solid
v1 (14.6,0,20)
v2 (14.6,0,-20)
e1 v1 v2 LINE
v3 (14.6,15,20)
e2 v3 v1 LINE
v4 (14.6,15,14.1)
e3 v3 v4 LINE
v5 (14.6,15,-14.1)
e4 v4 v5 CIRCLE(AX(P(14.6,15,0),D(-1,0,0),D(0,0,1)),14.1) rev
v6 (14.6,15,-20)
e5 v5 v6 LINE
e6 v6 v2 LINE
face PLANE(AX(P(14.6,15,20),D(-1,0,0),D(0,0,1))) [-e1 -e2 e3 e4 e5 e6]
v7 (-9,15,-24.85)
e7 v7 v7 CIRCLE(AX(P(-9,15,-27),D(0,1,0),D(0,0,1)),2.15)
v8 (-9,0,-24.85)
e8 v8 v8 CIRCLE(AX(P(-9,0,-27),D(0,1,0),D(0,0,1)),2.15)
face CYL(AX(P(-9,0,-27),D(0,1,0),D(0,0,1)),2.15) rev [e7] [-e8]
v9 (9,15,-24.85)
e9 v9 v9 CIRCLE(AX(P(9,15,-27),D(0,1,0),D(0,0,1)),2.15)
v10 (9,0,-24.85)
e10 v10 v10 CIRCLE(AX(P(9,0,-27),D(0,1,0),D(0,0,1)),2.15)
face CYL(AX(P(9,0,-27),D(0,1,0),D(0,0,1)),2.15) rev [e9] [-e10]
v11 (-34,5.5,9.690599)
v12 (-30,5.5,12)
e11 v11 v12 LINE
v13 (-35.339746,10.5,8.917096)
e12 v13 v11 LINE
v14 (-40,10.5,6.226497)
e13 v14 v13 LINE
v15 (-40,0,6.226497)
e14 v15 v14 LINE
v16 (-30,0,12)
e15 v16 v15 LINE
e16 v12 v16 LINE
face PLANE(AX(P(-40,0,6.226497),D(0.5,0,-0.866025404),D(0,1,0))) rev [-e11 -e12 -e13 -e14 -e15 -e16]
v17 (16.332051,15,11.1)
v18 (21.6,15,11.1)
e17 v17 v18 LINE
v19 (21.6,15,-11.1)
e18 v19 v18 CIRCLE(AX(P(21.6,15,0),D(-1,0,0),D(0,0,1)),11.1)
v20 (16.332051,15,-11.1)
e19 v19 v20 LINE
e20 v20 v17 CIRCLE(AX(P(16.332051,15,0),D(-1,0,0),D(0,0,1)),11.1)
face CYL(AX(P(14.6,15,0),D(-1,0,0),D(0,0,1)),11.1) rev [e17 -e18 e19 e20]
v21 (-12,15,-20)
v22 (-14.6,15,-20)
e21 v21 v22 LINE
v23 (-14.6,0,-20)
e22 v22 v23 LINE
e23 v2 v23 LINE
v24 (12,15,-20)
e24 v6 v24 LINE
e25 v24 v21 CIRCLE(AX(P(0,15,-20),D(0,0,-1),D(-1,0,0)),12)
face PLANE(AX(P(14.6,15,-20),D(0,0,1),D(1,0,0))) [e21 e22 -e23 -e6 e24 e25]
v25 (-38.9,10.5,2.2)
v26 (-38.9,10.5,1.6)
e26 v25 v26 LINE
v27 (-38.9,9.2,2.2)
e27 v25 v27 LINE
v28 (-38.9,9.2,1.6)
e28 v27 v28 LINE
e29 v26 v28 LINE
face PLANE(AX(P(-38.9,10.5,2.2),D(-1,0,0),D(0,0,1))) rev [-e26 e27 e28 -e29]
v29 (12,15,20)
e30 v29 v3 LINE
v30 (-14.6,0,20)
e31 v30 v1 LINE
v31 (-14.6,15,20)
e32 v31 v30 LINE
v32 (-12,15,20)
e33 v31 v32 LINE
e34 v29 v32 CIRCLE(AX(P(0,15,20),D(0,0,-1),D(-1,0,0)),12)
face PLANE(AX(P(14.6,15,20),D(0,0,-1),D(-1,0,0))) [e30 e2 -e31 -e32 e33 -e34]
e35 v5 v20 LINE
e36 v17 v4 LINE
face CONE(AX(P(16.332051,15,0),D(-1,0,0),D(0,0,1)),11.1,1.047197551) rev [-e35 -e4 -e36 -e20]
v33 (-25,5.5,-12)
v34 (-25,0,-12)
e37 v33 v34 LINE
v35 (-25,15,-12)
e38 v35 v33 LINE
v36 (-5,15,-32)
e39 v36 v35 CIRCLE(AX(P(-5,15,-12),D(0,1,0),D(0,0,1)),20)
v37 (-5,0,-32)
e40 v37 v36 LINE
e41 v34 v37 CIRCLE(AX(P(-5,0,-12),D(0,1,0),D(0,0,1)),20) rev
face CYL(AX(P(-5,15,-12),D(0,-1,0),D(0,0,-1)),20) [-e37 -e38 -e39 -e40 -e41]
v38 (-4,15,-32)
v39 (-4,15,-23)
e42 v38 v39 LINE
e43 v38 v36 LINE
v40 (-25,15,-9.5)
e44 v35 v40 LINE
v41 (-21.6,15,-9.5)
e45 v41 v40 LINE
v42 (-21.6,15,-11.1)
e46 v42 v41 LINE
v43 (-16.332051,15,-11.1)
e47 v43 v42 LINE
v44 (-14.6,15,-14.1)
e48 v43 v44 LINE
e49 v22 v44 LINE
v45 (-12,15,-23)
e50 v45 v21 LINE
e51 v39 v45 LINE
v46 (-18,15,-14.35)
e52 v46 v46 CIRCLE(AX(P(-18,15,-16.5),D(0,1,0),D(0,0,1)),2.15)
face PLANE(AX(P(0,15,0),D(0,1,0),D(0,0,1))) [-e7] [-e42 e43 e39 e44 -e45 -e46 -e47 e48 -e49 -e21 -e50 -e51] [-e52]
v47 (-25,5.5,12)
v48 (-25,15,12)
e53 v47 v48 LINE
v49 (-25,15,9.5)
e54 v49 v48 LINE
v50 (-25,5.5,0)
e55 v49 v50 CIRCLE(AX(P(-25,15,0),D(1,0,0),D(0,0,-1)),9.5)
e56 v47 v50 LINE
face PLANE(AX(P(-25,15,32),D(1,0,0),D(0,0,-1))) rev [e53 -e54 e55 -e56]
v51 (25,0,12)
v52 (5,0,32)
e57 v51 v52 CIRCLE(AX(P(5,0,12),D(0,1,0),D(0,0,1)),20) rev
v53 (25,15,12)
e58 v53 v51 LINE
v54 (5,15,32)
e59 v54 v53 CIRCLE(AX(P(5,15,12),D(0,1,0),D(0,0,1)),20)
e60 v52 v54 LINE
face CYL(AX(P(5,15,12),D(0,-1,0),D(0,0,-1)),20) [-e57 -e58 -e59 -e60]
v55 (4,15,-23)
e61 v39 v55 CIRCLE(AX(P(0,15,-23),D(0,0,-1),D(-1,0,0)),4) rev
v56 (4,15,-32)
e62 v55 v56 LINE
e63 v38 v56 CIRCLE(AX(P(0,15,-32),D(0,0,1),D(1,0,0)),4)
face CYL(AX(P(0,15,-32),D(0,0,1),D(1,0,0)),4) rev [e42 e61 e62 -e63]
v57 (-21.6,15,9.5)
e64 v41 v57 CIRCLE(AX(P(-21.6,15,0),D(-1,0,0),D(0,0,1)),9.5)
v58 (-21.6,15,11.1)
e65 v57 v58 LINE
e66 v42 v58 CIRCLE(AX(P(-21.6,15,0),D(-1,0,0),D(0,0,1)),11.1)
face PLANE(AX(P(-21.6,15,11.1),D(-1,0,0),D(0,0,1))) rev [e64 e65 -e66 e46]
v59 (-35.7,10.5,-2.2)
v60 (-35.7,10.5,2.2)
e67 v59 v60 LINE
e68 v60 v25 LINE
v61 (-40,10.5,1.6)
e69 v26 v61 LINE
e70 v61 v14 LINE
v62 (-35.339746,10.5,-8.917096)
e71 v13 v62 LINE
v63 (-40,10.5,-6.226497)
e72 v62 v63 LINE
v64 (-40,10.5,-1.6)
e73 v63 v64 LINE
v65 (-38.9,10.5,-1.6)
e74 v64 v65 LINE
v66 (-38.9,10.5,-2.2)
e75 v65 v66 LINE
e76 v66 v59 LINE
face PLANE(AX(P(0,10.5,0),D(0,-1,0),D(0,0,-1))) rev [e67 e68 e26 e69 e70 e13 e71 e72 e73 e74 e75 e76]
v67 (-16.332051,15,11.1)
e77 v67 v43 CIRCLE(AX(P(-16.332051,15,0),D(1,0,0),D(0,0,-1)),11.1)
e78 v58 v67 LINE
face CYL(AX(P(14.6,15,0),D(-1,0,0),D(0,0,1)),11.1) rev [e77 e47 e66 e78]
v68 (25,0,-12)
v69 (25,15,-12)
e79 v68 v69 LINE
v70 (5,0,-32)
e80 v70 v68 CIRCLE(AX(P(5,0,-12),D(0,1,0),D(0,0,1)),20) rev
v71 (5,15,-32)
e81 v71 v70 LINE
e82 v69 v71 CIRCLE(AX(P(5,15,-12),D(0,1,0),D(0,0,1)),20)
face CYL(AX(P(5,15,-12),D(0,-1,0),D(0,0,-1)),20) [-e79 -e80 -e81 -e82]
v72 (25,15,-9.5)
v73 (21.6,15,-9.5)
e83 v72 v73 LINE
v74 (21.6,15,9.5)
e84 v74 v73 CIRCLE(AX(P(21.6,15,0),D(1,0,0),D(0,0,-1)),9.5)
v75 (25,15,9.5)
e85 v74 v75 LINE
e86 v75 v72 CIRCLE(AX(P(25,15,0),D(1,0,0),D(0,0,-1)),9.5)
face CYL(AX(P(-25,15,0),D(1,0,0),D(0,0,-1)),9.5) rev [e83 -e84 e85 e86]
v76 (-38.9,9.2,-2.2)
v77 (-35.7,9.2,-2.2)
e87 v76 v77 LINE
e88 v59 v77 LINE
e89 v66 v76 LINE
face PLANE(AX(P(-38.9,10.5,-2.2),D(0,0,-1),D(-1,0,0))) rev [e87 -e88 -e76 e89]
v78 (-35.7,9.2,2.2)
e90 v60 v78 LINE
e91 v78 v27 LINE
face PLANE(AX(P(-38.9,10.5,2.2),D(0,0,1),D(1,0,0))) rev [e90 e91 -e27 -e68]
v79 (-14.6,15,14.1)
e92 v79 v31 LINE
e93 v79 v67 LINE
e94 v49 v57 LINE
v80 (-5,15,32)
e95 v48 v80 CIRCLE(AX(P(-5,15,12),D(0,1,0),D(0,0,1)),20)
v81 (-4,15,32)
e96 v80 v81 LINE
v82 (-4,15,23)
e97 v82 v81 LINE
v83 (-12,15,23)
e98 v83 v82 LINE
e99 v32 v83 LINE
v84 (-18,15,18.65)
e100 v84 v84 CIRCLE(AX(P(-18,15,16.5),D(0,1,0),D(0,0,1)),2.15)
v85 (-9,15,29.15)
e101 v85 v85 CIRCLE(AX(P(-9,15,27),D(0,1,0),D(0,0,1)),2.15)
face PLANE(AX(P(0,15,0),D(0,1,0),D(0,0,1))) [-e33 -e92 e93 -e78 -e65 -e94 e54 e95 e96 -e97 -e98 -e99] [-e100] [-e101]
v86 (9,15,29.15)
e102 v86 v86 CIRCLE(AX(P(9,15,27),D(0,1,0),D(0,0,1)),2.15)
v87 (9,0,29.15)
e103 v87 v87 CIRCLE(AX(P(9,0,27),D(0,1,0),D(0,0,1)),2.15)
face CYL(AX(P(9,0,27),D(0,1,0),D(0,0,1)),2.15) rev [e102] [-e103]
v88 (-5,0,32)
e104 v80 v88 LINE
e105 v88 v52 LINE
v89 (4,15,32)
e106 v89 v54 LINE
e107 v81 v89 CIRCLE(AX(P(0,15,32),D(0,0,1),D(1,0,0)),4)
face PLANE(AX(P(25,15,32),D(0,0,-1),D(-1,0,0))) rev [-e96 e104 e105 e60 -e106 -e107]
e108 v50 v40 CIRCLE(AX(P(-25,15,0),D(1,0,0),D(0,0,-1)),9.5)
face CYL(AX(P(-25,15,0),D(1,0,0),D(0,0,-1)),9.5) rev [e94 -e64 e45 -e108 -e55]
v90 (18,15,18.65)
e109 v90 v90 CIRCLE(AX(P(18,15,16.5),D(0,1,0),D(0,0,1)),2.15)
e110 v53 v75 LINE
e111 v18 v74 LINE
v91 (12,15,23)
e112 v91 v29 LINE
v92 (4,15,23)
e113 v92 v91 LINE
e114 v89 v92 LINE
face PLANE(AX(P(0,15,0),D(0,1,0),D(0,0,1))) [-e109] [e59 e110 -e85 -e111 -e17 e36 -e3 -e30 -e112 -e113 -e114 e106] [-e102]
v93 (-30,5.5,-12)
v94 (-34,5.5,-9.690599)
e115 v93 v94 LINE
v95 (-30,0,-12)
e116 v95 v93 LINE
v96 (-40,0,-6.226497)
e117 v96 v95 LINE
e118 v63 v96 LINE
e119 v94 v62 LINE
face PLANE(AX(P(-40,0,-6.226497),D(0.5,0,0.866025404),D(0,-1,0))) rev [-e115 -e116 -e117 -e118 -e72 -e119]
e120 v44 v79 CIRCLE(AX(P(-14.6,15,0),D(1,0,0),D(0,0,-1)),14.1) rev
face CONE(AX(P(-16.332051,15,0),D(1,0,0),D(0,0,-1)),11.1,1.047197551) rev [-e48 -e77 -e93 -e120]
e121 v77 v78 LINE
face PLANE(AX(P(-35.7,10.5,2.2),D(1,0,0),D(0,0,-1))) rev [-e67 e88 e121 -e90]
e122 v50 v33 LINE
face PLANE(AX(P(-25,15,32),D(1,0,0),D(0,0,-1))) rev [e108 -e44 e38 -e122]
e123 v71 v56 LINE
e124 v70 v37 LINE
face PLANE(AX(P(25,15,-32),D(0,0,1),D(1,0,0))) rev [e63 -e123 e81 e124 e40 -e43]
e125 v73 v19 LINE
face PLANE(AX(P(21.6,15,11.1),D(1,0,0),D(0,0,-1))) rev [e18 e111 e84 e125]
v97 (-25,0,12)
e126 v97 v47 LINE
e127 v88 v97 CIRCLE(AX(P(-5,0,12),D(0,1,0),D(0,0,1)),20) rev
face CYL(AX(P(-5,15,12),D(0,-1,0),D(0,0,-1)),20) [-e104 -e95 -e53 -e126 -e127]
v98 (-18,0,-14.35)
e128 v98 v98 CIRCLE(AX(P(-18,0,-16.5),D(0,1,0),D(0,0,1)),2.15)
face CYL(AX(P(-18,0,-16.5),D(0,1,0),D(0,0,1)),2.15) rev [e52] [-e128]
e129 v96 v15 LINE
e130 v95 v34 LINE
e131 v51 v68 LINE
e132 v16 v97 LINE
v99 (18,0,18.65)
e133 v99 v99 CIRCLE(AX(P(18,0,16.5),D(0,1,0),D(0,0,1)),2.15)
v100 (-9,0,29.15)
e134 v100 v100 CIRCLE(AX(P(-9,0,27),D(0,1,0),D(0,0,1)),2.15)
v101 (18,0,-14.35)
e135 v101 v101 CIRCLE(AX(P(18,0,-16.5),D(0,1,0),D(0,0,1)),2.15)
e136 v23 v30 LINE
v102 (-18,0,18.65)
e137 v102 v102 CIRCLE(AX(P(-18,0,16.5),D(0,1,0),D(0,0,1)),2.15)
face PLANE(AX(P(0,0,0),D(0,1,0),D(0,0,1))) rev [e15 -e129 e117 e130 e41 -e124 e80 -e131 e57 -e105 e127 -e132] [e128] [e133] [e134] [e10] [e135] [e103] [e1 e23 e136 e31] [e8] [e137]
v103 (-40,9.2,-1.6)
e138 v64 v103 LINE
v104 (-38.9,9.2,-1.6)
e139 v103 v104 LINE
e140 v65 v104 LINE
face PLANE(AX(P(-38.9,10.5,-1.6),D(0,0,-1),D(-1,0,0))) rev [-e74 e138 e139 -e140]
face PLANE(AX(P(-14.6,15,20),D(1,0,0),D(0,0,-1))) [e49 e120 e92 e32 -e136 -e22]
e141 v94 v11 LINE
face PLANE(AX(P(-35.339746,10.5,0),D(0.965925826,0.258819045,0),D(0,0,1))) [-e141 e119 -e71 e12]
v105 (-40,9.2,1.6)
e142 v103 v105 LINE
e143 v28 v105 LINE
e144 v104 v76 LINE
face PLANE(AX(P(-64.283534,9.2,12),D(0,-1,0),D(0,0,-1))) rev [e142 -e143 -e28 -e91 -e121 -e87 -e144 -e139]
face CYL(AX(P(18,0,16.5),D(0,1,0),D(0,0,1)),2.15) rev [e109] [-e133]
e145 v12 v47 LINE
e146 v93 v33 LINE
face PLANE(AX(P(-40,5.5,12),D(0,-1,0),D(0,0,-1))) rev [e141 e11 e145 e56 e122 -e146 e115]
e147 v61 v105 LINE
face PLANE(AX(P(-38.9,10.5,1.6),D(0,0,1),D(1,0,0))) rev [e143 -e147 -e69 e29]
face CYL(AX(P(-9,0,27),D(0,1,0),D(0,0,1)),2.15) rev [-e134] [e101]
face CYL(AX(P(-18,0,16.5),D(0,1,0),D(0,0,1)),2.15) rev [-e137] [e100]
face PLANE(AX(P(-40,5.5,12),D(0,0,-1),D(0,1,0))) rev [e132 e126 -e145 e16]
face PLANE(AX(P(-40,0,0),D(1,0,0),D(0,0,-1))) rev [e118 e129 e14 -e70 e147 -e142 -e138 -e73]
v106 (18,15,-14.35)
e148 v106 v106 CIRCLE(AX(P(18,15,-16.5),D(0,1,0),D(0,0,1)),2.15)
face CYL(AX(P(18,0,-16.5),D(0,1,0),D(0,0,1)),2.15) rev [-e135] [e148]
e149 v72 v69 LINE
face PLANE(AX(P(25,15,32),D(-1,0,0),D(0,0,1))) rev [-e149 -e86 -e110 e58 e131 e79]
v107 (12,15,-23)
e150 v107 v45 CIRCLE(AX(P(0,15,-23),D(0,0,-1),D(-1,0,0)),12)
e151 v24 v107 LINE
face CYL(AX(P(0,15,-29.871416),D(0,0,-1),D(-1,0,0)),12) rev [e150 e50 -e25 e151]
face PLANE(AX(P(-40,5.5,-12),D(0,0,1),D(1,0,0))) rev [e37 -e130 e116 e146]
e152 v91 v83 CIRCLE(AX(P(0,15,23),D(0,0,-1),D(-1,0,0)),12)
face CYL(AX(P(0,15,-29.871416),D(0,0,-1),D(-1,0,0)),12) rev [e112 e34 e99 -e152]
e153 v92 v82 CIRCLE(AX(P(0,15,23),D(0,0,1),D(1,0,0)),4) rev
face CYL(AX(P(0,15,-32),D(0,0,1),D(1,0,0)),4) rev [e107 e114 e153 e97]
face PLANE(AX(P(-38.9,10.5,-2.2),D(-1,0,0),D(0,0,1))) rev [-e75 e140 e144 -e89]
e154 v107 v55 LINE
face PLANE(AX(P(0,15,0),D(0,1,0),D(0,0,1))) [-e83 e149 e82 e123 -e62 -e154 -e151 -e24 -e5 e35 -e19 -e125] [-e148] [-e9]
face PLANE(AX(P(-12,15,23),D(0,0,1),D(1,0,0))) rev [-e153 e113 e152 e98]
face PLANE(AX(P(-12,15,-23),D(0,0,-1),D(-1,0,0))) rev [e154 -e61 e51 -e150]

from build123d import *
from OCP.BRepFilletAPI import BRepFilletAPI_MakeChamfer

# Parameters (mm, degrees)
SKETCH1_W           = 50
SKETCH1_H           = 64
SKETCH1_W_2         = 29.2
SKETCH1_H_2         = 40
BOSS_EXTRUDE1_DEPTH = 15
SKETCH3_W           = 7
SKETCH3_H           = 11.1
SKETCH4_R           = 9.5
CUT_EXTRUDE2_DEPTH  = 62.229078059
SKETCH5_R           = 4
CUT_EXTRUDE3_DEPTH  = 71.32780389
SKETCH8_R           = 2.15
CUT_EXTRUDE6_DEPTH  = 44.289721644
FILLET1_R           = 20
CHAMFER1_SIZE       = 3
CHAMFER1_SIZE2      = 1.732050808
SKETCH9_W           = 12
SKETCH9_H           = 3
SKETCH10_W          = 24
SKETCH10_H          = 5.5
BOSS_EXTRUDE2_DEPTH = 15
BOSS_EXTRUDE3_START = 9
SKETCH12_W          = 24
SKETCH12_H          = 3.7
BOSS_EXTRUDE3_DEPTH = 6
BOSS_EXTRUDE4_DEPTH = 1.3
CHAMFER2_SIZE2      = 1.339745962
CHAMFER2_SIZE       = 5
CHAMFER3_SIZE       = 10
CHAMFER3_SIZE2      = 5.773502692


with BuildPart() as part:
    # Sketch1 → Boss-Extrude1 (new body)
    with BuildSketch(Plane(origin=(0, 0, 0), x_dir=(1, 0, 0), z_dir=(0, 1, 0))):
        Rectangle(SKETCH1_W, SKETCH1_H)
        Rectangle(SKETCH1_W_2, SKETCH1_H_2, mode=Mode.SUBTRACT)
    extrude(amount=BOSS_EXTRUDE1_DEPTH)

    # Sketch3 → Cut-Revolve1 (revolve, cut)
    with BuildSketch(Plane(origin=(0, 15, 0), x_dir=(1, 0, 0), z_dir=(0, 1, 0))):
        with Locations((18.1, -5.55)):
            Rectangle(SKETCH3_W, SKETCH3_H)
        with Locations((-18.1, -5.55)):
            Rectangle(SKETCH3_W, SKETCH3_H)
    revolve(axis=Axis((14.6, 15, 0), (1, 0, 0)), mode=Mode.SUBTRACT)

    # Sketch4 → Cut-Extrude2 (cut, through all)
    with BuildSketch(Plane(origin=(25, 0, 0), x_dir=(0, 0, -1), z_dir=(1, 0, 0))):
        with Locations((0, 15)):
            Circle(SKETCH4_R)
    extrude(amount=-CUT_EXTRUDE2_DEPTH, mode=Mode.SUBTRACT)

    # Sketch5 → Cut-Extrude3 (cut, through all)
    with BuildSketch(Plane.XY.offset(32)):
        with Locations((0, 15)):
            Circle(SKETCH5_R)
    extrude(amount=-CUT_EXTRUDE3_DEPTH, mode=Mode.SUBTRACT)

    # Sketch8 → Cut-Extrude6 (cut, through all)
    with BuildSketch(Plane(origin=(0, 15, 0), x_dir=(1, 0, 0), z_dir=(0, 1, 0))):
        with Locations(Location((18, 16.5, 0), (0, 0, 270))):
            Circle(SKETCH8_R)
        with Locations(Location((18, -16.5, 0), (0, 0, 270))):
            Circle(SKETCH8_R)
        with Locations(Location((-18, -16.5, 0), (0, 0, 270))):
            Circle(SKETCH8_R)
        with Locations(Location((-18, 16.5, 0), (0, 0, 270))):
            Circle(SKETCH8_R)
        with Locations(Location((9, -27, 0), (0, 0, 270))):
            Circle(SKETCH8_R)
        with Locations(Location((-9, -27, 0), (0, 0, 270))):
            Circle(SKETCH8_R)
        with Locations(Location((-9, 27, 0), (0, 0, 270))):
            Circle(SKETCH8_R)
        with Locations(Location((9, 27, 0), (0, 0, 270))):
            Circle(SKETCH8_R)
    extrude(amount=-CUT_EXTRUDE6_DEPTH, mode=Mode.SUBTRACT)

    # Fillet1
    fillet1_edges = [part.edges().sort_by_distance(p)[0] for p in [
        (-25, 7.5, -32),
        (25, 7.5, -32),
        (25, 7.5, 32),
        (-25, 7.5, 32),
    ]]
    fillet(fillet1_edges, radius=FILLET1_R)

    # Chamfer1: one chamfer whose edges measure the first distance from different faces: ONE call of the kernel's chamfer builder (chamfer() names one face for all edges)
    chamfer1_edges_1 = [part.edges().sort_by_distance(p)[0] for p in [
        (14.6, 3.9, 0),
    ]]
    chamfer1_side_1 = [part.faces().sort_by_distance(p)[0] for p in [
        (14.6, 0.427200187, 0),
    ]]
    chamfer1_edges_2 = [part.edges().sort_by_distance(p)[0] for p in [
        (-14.6, 3.9, 0),
    ]]
    chamfer1_side_2 = [part.faces().sort_by_distance(p)[0] for p in [
        (-14.6, 0.427200187, 0),
    ]]
    chamfer1 = BRepFilletAPI_MakeChamfer(part.part.solid().wrapped)
    for e in chamfer1_edges_1:
        chamfer1.Add(CHAMFER1_SIZE, CHAMFER1_SIZE2, e.wrapped, chamfer1_side_1[0].wrapped)  # the first distance lies on this face
    for e in chamfer1_edges_2:
        chamfer1.Add(CHAMFER1_SIZE, CHAMFER1_SIZE2, e.wrapped, chamfer1_side_2[0].wrapped)  # the first distance lies on this face
    add(Compound.cast(chamfer1.Shape()), mode=Mode.REPLACE)

    # Sketch9 → Cut-Revolve2 (revolve, cut)
    with BuildSketch(Plane(origin=(0, 15, 0), x_dir=(1, 0, 0), z_dir=(0, 1, 0))):
        with Locations((-6, -21.5)):
            Rectangle(SKETCH9_W, SKETCH9_H)
        with Locations((-6, 21.5)):
            Rectangle(SKETCH9_W, SKETCH9_H)
    revolve(axis=Axis((0, 15, -29.871415895), (0, 0, 1)), mode=Mode.SUBTRACT)

    # Sketch10 → Boss-Extrude2 (add)
    with BuildSketch(Plane.ZY.offset(25)):
        with Locations((0, 2.75)):
            Rectangle(SKETCH10_W, SKETCH10_H)
    extrude(amount=BOSS_EXTRUDE2_DEPTH)

    # Sketch12 → Boss-Extrude3 (add)
    with BuildSketch(Plane.ZY.offset(25).offset(BOSS_EXTRUDE3_START)):
        with Locations((0, 7.35)):
            Rectangle(SKETCH12_W, SKETCH12_H)
    extrude(amount=BOSS_EXTRUDE3_DEPTH)

    # Sketch13 → Boss-Extrude4 (add)
    with BuildSketch(Plane(origin=(0, 9.2, 0), x_dir=(1, 0, 0), z_dir=(0, 1, 0))):
        Polygon((-38.9, 2.2), (-38.9, 1.6), (-40, 1.6), (-40, 12), (-34, 12), (-34, -12), (-40, -12), (-40, -1.6), (-38.9, -1.6), (-38.9, -2.2), (-35.7, -2.2), (-35.7, 2.2), align=None)
    extrude(amount=BOSS_EXTRUDE4_DEPTH)

    # Chamfer2
    chamfer2_edges = [part.edges().sort_by_distance(p)[0] for p in [
        (-34, 10.5, 0),
    ]]
    chamfer2_side = [part.faces().sort_by_distance(p)[0] for p in [
        (-34, 10.473205081, 0),
    ]]
    chamfer(chamfer2_edges, length=CHAMFER2_SIZE - 0.0001, length2=CHAMFER2_SIZE2 - 0.0001, reference=chamfer2_side[0])  # a hair under: the kernel refuses the full size

    # Chamfer3: one chamfer whose edges measure the first distance from different faces: ONE call of the kernel's chamfer builder (chamfer() names one face for all edges)
    chamfer3_edges_1 = [part.edges().sort_by_distance(p)[0] for p in [
        (-40, 5.25, 12),
    ]]
    chamfer3_side_1 = [part.faces().sort_by_distance(p)[0] for p in [
        (-33.677093858, 4.00630158, 12),
    ]]
    chamfer3_edges_2 = [part.edges().sort_by_distance(p)[0] for p in [
        (-40, 5.25, -12),
    ]]
    chamfer3_side_2 = [part.faces().sort_by_distance(p)[0] for p in [
        (-33.677093858, 4.00630158, -12),
    ]]
    chamfer3 = BRepFilletAPI_MakeChamfer(part.part.solid().wrapped)
    for e in chamfer3_edges_1:
        chamfer3.Add(CHAMFER3_SIZE, CHAMFER3_SIZE2, e.wrapped, chamfer3_side_1[0].wrapped)  # the first distance lies on this face
    for e in chamfer3_edges_2:
        chamfer3.Add(CHAMFER3_SIZE, CHAMFER3_SIZE2, e.wrapped, chamfer3_side_2[0].wrapped)  # the first distance lies on this face
    add(Compound.cast(chamfer3.Shape()), mode=Mode.REPLACE)


solid = part.part
